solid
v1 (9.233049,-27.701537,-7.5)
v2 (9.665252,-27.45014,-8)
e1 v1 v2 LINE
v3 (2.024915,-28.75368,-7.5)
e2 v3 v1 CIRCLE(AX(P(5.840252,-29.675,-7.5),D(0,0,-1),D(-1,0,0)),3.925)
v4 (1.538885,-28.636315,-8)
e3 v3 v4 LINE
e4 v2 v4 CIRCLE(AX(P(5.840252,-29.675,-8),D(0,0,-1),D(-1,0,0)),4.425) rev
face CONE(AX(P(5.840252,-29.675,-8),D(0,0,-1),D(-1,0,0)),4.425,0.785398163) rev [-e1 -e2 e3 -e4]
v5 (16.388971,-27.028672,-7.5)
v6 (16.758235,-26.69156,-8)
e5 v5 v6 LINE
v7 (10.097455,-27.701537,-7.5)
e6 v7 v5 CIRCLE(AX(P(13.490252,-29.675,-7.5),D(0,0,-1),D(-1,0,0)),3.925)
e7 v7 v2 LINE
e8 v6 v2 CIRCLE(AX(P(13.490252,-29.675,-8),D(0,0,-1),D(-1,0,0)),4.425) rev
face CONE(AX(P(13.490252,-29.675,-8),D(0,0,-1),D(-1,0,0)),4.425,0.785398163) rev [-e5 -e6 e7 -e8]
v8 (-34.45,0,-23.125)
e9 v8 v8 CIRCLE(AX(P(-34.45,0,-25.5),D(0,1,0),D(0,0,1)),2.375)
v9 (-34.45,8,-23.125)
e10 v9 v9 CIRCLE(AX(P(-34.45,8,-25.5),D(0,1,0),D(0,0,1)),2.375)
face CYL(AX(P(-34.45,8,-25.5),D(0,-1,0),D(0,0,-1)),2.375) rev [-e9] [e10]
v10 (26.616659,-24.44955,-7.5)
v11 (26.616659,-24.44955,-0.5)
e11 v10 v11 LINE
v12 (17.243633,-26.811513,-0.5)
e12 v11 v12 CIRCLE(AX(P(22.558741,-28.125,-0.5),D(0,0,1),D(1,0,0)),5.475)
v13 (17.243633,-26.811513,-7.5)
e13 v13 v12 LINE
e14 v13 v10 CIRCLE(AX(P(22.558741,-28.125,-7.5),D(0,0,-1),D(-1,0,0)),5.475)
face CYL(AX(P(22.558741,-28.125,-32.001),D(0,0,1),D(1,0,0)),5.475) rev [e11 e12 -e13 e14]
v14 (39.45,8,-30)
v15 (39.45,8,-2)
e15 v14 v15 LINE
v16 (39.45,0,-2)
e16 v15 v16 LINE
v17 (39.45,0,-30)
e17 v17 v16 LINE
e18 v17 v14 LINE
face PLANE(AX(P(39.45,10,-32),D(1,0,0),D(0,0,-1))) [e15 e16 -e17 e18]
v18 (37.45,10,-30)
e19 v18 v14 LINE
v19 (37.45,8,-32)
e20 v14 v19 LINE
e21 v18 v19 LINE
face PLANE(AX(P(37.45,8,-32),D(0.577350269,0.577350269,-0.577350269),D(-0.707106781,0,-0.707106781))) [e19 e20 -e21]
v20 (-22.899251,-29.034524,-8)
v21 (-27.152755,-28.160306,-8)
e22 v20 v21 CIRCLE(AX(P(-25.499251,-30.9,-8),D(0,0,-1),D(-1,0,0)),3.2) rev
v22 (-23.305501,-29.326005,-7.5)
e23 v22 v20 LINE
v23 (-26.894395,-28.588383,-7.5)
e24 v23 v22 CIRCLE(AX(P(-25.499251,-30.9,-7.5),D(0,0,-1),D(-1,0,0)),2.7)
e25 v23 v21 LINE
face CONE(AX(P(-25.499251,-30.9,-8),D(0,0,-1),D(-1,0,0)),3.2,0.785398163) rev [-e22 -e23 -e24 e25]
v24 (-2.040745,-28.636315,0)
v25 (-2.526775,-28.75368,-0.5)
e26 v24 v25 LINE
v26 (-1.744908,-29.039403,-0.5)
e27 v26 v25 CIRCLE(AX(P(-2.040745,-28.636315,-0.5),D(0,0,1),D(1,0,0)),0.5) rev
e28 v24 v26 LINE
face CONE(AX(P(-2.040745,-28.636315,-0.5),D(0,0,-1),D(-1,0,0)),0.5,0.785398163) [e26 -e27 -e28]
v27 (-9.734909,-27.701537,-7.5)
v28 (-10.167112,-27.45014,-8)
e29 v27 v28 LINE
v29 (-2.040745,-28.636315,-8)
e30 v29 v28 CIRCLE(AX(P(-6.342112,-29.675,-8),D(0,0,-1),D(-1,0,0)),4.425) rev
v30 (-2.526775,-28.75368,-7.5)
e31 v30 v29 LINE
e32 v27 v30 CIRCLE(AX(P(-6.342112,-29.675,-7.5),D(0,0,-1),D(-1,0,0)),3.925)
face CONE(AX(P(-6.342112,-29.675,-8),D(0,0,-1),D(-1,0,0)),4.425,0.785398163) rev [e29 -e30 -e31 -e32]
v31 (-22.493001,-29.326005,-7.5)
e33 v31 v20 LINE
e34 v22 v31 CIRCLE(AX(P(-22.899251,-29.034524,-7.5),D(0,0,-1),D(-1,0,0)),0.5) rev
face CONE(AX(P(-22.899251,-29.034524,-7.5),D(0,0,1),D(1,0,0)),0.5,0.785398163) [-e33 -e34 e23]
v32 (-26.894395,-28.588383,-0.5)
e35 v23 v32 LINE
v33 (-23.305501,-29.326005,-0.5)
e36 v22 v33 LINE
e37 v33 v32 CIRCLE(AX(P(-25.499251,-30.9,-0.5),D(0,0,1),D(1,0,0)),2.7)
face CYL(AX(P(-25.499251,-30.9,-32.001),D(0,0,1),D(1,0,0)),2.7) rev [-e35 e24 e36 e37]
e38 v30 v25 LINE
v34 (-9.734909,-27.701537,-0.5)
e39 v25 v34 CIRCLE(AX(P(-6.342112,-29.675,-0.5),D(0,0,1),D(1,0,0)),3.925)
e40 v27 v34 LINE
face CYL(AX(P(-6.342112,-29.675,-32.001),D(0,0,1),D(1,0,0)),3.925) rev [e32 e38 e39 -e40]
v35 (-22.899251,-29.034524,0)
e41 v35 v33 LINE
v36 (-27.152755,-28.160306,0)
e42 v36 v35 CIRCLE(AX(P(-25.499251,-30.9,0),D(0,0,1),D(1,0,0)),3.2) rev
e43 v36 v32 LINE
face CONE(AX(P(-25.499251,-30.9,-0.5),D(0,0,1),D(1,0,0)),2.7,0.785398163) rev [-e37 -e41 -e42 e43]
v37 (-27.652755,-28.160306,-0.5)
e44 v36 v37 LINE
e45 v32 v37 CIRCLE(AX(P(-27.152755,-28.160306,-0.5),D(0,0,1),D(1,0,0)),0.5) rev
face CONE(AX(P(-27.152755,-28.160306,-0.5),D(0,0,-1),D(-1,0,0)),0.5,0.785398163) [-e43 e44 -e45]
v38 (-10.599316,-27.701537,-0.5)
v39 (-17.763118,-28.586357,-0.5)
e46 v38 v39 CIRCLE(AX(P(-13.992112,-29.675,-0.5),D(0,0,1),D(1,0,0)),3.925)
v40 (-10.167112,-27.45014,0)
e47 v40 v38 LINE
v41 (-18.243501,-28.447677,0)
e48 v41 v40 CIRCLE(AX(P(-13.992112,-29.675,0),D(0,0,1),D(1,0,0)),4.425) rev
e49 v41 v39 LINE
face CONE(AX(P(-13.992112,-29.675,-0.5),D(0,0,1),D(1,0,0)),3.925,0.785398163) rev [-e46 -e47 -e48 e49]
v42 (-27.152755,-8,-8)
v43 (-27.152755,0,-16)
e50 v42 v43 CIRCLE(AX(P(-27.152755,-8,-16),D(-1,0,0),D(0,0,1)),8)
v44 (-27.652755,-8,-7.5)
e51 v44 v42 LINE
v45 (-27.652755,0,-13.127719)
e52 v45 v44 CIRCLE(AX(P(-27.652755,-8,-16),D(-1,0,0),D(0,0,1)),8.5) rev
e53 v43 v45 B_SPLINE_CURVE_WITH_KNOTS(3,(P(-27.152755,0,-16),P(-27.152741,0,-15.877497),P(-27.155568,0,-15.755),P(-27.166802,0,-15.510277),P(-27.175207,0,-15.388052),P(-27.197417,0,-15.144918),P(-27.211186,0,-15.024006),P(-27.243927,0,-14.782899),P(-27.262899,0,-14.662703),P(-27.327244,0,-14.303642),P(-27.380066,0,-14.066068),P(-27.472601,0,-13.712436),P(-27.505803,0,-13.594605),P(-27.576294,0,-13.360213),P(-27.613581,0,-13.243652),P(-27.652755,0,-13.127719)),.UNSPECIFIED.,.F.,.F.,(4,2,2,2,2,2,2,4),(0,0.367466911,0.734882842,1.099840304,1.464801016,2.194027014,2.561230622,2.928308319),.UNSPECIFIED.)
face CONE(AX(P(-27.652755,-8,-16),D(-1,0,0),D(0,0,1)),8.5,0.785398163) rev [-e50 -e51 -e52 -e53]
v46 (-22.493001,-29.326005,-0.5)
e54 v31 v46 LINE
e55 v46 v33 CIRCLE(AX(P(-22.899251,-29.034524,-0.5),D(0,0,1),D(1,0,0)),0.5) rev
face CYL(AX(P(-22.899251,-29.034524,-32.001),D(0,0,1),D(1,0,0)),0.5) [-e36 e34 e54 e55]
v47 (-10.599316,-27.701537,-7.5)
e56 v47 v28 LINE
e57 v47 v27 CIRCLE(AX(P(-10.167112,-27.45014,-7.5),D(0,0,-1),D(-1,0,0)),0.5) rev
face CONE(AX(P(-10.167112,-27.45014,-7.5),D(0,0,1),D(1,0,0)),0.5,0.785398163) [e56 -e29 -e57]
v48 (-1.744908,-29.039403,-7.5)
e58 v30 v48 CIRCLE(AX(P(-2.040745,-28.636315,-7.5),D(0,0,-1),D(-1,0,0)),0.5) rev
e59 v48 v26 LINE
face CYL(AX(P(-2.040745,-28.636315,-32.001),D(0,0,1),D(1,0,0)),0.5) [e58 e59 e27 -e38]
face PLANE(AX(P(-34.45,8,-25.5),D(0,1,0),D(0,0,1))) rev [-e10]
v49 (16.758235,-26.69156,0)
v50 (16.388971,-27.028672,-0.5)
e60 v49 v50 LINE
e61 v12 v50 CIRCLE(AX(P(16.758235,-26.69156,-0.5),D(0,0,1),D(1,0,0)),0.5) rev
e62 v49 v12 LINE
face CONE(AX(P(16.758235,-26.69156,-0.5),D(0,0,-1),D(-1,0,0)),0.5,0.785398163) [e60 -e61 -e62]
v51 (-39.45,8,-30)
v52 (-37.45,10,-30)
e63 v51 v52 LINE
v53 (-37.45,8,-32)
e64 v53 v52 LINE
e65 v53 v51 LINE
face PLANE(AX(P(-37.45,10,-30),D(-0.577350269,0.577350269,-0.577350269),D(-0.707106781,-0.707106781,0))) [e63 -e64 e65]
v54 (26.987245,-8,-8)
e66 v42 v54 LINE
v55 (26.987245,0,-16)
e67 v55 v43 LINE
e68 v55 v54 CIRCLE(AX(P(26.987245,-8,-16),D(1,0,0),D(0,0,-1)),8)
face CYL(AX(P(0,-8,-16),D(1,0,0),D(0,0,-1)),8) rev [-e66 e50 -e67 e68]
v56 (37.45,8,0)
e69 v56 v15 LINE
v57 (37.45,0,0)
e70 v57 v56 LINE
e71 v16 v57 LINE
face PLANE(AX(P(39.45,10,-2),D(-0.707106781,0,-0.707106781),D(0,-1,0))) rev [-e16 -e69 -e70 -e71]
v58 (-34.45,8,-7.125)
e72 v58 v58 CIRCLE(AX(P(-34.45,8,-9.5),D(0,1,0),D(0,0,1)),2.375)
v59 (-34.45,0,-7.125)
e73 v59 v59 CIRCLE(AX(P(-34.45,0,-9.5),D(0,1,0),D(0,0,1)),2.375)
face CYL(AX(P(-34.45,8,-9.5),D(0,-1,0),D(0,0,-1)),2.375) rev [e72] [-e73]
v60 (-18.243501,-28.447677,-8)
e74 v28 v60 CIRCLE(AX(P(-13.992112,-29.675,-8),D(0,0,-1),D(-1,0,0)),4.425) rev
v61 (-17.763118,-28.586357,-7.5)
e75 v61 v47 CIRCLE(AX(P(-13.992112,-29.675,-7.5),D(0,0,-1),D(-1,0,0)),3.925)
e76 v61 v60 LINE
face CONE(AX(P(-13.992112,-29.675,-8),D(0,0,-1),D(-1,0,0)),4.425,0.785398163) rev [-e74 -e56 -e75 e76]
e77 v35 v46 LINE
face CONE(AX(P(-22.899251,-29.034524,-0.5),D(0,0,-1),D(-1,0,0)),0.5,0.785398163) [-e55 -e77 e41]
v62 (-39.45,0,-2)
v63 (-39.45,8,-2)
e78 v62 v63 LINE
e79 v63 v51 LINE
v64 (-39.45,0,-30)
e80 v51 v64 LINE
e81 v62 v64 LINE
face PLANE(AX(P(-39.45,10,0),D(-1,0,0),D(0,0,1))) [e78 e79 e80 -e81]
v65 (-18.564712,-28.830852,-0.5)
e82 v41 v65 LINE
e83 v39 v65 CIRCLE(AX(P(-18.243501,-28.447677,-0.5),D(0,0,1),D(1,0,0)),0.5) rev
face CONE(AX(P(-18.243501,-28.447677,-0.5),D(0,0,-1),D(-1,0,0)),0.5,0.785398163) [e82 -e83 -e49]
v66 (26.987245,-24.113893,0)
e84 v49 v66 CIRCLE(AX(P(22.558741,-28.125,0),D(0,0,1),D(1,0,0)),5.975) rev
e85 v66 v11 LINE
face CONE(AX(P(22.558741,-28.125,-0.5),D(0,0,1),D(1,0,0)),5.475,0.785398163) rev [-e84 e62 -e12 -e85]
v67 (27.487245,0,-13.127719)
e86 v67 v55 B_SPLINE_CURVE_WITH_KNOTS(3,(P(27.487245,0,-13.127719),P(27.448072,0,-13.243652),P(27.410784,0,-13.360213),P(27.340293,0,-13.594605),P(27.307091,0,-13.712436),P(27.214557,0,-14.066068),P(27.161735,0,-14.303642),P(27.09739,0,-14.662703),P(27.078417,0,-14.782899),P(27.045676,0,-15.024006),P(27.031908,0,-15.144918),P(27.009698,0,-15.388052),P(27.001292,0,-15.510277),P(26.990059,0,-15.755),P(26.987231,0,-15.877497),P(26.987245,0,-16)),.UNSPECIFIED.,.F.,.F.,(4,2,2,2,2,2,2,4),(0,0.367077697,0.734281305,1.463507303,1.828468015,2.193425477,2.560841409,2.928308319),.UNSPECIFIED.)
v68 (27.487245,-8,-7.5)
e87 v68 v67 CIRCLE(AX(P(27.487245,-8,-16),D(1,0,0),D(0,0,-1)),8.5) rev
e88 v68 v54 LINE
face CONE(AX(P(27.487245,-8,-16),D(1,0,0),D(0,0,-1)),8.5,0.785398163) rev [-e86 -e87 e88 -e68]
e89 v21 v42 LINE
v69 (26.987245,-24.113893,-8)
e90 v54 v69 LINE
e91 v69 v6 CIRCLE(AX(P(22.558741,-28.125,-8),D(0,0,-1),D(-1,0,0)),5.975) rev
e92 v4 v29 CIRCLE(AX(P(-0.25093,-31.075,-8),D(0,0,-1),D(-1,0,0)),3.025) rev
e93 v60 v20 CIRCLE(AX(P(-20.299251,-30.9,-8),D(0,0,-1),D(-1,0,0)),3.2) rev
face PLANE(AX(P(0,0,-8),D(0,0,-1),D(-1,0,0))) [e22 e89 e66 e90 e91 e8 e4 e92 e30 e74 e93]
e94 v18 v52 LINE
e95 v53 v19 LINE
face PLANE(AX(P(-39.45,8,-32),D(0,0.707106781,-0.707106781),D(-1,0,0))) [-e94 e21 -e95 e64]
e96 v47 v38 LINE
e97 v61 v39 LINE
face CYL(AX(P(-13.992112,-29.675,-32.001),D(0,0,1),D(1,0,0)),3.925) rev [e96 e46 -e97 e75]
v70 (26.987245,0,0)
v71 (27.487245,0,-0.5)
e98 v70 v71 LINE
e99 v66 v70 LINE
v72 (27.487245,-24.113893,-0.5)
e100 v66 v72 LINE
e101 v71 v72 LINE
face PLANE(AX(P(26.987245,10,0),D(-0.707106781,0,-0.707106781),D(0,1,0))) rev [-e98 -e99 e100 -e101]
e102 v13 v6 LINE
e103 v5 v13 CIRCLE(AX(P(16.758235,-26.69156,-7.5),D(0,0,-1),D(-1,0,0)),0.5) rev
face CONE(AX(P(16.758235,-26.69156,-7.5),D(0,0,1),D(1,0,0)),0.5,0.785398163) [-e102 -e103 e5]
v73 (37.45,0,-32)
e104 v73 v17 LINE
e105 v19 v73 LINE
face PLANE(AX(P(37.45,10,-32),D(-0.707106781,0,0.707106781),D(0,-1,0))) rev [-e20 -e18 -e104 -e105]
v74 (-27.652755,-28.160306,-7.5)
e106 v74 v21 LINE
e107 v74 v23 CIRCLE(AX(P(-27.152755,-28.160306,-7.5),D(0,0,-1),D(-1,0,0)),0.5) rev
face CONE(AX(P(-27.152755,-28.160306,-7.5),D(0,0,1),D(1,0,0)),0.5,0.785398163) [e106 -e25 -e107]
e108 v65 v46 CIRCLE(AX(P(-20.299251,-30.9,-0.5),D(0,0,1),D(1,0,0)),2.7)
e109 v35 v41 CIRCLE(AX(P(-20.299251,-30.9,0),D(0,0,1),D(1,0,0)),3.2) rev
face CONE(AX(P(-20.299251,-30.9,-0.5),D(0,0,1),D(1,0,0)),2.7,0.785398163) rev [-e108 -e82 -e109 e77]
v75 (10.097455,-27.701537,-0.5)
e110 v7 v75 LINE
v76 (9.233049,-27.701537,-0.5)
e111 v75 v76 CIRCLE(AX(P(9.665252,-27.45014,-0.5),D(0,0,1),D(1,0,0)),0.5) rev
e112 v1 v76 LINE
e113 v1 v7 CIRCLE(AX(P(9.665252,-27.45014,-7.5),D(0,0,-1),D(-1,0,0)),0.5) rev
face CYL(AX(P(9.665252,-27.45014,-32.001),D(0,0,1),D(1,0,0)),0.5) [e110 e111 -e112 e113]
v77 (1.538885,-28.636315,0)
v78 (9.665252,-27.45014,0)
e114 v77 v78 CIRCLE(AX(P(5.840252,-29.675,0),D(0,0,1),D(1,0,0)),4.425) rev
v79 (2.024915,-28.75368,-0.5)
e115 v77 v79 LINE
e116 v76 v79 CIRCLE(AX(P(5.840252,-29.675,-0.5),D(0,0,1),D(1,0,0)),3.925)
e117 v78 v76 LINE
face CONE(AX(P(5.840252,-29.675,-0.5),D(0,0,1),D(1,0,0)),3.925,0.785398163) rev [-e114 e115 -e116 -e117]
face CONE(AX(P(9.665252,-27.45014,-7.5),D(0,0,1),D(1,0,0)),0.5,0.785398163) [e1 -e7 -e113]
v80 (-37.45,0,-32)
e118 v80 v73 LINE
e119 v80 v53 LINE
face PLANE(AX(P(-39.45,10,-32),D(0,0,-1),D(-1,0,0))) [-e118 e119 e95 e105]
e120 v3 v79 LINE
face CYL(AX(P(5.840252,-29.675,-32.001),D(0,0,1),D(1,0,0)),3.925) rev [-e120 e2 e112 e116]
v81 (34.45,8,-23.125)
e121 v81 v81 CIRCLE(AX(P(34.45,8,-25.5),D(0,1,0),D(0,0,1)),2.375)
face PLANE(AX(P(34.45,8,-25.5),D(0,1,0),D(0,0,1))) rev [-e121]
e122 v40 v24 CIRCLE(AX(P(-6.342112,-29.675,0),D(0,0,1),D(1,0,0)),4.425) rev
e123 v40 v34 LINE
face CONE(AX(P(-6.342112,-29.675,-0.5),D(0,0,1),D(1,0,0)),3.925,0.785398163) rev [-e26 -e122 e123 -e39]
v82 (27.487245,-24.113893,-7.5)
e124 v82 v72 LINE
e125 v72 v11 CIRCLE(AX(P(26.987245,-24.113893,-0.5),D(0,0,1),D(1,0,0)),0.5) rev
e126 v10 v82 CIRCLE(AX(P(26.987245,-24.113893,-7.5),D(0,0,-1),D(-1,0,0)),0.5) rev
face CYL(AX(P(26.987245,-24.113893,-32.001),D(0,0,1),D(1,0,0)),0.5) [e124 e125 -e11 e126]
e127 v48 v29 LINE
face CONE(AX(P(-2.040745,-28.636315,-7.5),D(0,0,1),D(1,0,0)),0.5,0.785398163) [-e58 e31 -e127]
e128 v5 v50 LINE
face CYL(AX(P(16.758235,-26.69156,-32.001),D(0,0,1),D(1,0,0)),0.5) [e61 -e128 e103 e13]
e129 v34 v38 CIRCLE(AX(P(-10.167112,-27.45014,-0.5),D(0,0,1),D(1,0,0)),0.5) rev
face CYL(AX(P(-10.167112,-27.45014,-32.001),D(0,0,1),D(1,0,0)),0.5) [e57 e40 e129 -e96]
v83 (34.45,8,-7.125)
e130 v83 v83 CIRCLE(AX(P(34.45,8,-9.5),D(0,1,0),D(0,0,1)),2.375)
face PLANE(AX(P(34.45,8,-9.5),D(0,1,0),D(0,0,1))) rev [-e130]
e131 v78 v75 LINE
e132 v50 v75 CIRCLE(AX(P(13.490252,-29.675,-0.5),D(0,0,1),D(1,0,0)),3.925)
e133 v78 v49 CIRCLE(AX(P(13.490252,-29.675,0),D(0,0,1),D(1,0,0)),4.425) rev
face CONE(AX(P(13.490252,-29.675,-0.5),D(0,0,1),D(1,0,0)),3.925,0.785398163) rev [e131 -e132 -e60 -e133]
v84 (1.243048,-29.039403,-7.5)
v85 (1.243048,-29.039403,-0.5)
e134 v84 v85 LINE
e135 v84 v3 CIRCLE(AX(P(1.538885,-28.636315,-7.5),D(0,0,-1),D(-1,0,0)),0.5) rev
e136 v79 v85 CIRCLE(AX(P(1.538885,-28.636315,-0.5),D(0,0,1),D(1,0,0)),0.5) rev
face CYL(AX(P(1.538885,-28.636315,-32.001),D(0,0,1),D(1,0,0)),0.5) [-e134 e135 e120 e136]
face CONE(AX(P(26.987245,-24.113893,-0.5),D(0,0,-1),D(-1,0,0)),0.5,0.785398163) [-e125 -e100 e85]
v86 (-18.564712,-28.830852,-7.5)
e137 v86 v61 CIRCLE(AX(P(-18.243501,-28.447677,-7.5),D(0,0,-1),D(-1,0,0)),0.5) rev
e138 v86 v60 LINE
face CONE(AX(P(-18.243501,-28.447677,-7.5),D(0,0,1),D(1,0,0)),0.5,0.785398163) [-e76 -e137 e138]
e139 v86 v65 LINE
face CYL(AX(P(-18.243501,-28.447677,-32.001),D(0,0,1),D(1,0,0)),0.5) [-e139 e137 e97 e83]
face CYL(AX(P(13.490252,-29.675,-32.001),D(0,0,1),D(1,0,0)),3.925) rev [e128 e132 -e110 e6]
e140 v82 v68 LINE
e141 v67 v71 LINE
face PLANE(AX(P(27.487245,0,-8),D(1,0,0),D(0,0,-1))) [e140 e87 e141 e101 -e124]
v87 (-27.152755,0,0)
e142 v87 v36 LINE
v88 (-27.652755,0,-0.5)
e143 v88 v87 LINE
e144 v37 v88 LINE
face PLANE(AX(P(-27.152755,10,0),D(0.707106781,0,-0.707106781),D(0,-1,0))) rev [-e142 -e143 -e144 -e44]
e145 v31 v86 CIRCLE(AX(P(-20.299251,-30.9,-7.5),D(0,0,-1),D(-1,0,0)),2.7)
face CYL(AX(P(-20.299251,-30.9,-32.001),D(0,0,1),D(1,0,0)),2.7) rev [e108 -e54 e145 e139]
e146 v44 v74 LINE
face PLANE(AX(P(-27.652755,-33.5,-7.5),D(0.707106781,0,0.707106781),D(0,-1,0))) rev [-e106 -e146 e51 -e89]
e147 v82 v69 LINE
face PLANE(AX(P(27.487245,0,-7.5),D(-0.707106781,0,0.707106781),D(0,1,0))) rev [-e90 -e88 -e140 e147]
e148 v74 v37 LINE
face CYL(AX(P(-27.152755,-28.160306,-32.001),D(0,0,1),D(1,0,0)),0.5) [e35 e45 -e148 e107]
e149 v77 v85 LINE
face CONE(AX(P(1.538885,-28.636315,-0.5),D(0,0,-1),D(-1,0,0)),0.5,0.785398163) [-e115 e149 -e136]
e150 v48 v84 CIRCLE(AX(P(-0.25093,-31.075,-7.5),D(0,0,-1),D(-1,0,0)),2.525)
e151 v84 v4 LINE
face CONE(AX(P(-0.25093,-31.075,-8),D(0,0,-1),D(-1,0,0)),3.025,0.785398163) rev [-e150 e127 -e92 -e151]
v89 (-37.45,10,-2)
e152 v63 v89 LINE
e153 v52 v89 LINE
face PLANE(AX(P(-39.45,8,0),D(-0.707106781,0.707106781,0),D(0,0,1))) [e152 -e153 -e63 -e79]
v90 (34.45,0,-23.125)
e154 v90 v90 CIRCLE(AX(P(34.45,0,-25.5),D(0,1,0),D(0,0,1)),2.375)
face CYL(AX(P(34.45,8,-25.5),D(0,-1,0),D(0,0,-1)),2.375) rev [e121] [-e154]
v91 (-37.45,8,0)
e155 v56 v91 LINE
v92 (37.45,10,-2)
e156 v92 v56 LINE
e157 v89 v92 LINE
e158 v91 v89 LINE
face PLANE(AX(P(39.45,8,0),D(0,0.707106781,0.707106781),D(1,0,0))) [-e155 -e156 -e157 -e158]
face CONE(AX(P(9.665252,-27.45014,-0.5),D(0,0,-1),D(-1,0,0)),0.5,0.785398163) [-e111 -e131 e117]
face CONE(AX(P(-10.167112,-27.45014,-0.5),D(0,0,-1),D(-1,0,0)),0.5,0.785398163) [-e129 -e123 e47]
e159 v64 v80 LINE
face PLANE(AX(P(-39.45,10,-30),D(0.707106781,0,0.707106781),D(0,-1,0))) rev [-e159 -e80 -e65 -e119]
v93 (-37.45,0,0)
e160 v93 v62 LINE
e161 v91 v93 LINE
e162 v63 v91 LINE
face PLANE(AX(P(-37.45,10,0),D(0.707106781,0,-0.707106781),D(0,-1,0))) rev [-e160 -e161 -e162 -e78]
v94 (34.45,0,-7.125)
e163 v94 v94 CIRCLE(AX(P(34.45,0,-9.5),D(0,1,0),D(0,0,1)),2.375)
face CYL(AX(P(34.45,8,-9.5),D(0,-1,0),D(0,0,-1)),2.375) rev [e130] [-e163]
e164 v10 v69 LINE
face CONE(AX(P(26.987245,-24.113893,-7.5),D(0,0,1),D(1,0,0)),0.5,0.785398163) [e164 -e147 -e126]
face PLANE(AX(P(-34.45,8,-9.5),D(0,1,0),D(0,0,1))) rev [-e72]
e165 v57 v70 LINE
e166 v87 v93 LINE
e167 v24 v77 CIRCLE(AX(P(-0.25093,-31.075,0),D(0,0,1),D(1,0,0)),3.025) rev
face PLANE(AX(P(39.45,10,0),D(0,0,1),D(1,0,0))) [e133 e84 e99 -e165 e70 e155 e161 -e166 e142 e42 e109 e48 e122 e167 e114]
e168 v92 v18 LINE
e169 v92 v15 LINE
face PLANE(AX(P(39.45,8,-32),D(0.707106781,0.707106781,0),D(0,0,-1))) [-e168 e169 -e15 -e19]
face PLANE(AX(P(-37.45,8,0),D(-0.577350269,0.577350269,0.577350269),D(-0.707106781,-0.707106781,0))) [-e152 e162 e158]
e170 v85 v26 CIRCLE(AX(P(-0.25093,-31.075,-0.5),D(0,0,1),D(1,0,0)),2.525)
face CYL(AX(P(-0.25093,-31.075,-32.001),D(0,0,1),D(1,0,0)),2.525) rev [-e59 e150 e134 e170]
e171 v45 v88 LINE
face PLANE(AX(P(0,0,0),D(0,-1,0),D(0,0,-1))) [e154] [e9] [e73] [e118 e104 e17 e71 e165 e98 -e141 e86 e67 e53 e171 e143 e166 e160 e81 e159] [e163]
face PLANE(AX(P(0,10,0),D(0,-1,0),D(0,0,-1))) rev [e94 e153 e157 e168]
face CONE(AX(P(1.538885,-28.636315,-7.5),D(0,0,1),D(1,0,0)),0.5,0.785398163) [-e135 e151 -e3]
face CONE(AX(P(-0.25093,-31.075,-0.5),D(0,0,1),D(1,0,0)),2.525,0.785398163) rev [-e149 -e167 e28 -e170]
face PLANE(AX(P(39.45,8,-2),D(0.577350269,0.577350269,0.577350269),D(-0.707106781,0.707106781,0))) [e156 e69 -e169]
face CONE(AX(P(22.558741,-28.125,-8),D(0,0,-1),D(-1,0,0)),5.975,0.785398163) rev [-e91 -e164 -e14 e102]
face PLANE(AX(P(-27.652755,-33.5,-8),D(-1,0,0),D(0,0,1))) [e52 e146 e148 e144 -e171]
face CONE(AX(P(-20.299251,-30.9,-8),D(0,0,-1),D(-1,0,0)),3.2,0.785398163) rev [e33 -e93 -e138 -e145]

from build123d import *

# Parameters (mm, degrees)
SKETCH3_W           = 78.9
SKETCH3_H           = 32
BOSS_EXTRUDE1_DEPTH = 10
SKETCH3_4_R         = 2.375
CUT_EXTRUDE1_DEPTH  = 8
SKETCH4_W           = 55.14
SKETCH4_H           = 33.5
BOSS_EXTRUDE2_DEPTH = 8
CUT_EXTRUDE2_REACH  = 62.849
FILLET1_R           = 8
CHAMFER1_SIZE       = 2
CHAMFER2_SIZE       = 0.5


with BuildPart() as part:
    # Sketch3 → Boss-Extrude1 (new body)
    with BuildSketch(Plane(origin=(0, 0, 0), x_dir=(1, 0, 0), z_dir=(0, 1, 0))):
        with Locations((0, 16)):
            Rectangle(SKETCH3_W, SKETCH3_H)
    extrude(amount=BOSS_EXTRUDE1_DEPTH)

    # Sketch3<4> → Cut-Extrude1 (cut)
    with BuildSketch(Plane(origin=(0, 0, 0), x_dir=(1, 0, 0), z_dir=(0, 1, 0))):
        with Locations(Location((-34.45, 9.5, 0), (0, 0, 270))):
            Circle(SKETCH3_4_R)
        with Locations(Location((34.45, 9.5, 0), (0, 0, 270))):
            Circle(SKETCH3_4_R)
        with Locations(Location((-34.45, 25.5, 0), (0, 0, 270))):
            Circle(SKETCH3_4_R)
        with Locations(Location((34.45, 25.5, 0), (0, 0, 270))):
            Circle(SKETCH3_4_R)
    extrude(amount=CUT_EXTRUDE1_DEPTH, mode=Mode.SUBTRACT)

    # Sketch4 → Boss-Extrude2 (add)
    with BuildSketch(Plane.XY):
        with Locations((-0.082754798, -16.75)):
            Rectangle(SKETCH4_W, SKETCH4_H)
    extrude(amount=-BOSS_EXTRUDE2_DEPTH)

    # Sketch6 → Cut-Extrude2 (cut, up to next)
    with BuildSketch(Plane.XY, mode=Mode.PRIVATE) as cut_extrude2_sk1:
        with BuildLine():
            Line((-27.652754798, -33.5), (27.487245202, -33.5))
            Line((27.487245202, -33.5), (27.487245202, -24.11389297))
            ThreePointArc((27.487245202, -24.11389297), (27.167115928, -24.580418984), (26.616659115, -24.449550462))
            ThreePointArc((26.616659115, -24.449550462), (21.220888935, -22.815972253), (17.243633004, -26.811513376))
            ThreePointArc((17.243633004, -26.811513376), (16.881366116, -27.176161871), (16.388971366, -27.028672095))
            ThreePointArc((16.388971366, -27.028672095), (13.072861481, -25.77225608), (10.097455449, -27.701537013))
            ThreePointArc((10.097455449, -27.701537013), (9.665252059, -27.950140454), (9.23304867, -27.701537013))
            ThreePointArc((9.23304867, -27.701537013), (5.273342581, -25.791156717), (2.024915276, -28.753680172))
            ThreePointArc((2.024915276, -28.753680172), (1.710503102, -29.105939189), (1.243047888, -29.039403086))
            ThreePointArc((1.243047888, -29.039403086), (-0.250930092, -28.55), (-1.744908072, -29.039403086))
            ThreePointArc((-1.744908072, -29.039403086), (-2.212363286, -29.105939189), (-2.526775459, -28.753680172))
            ThreePointArc((-2.526775459, -28.753680172), (-5.775202765, -25.791156717), (-9.734908853, -27.701537013))
            ThreePointArc((-9.734908853, -27.701537013), (-10.167112243, -27.950140454), (-10.599315633, -27.701537013))
            ThreePointArc((-10.599315633, -27.701537013), (-14.473243405, -25.779600431), (-17.763117677, -28.586357258))
            ThreePointArc((-17.763117677, -28.586357258), (-18.097629496, -28.925925167), (-18.564711553, -28.830852177))
            ThreePointArc((-18.564711553, -28.830852177), (-20.636908569, -28.221196647), (-22.493001056, -29.326004785))
            ThreePointArc((-22.493001056, -29.326004785), (-22.899251056, -29.534524189), (-23.305501056, -29.326004785))
            ThreePointArc((-23.305501056, -29.326004785), (-24.955684592, -28.255281584), (-26.894394838, -28.588382855))
            ThreePointArc((-26.894394838, -28.588382855), (-27.398539277, -28.595724932), (-27.652754798, -28.160305606))
            Line((-27.652754798, -28.160305606), (-27.652754798, -33.5))
        make_face()
    cut_extrude2_tool1 = extrude(cut_extrude2_sk1.sketch, amount=-CUT_EXTRUDE2_REACH, mode=Mode.PRIVATE) & part.part
    add(cut_extrude2_tool1.solids().sort_by_distance((2.915251, -29.773814, 0))[0], mode=Mode.SUBTRACT)

    # Fillet1
    fillet1_edges = [part.edges().sort_by_distance(p)[0] for p in [
        (-0.082754798, 0, -8),
    ]]
    fillet(fillet1_edges, radius=FILLET1_R)

    # Chamfer1
    chamfer1_edges = [part.edges().sort_by_distance(p)[0] for p in [
        (39.45, 10, -16),
        (0, 10, 0),
        (-39.45, 10, -16),
        (0, 10, -32),
        (-39.45, 5, 0),
        (39.45, 5, 0),
        (39.45, 5, -32),
        (-39.45, 5, -32),
    ]]
    chamfer(chamfer1_edges, length=CHAMFER1_SIZE)

    # Chamfer2
    # the kernel refuses this chamfer: 0.5 mm, written as the material it takes off along each edge
    with BuildSketch(Plane(origin=(-27.652754798, -28.160305606, -8), x_dir=(0, 0, 1), z_dir=(0, 1, 0))) as chamfer2_piece_1:
        Polygon((CHAMFER2_SIZE, 0), (0, CHAMFER2_SIZE), (0, 0), align=None)
    extrude(amount=20.160305606, mode=Mode.SUBTRACT)
    with BuildSketch(Plane(origin=(-27.652754798, -8, -16), x_dir=(0, 0.8858914010009324, -0.4638926876257108), z_dir=(0, -0.4638926876257108, -0.8858914010009324))) as chamfer2_piece_2_section:
        Polygon((8 + CHAMFER2_SIZE, 0), (8, CHAMFER2_SIZE), (8, 0), align=None)
    chamfer2_piece_2 = revolve(axis=Axis((-27.652754798, -8, -16), (1, 0, 0)), revolution_arc=117.638582209, mode=Mode.PRIVATE)
    chamfer2_piece_2 = split(chamfer2_piece_2, bisect_by=Plane(origin=(-27.652754798, 0, -16), z_dir=(0, -1, 0)), keep=Keep.TOP, mode=Mode.PRIVATE)
    add(chamfer2_piece_2, mode=Mode.SUBTRACT)
    with BuildSketch(Plane(origin=(27.487245202, -8, -16), x_dir=(0, 0.8858914010009324, -0.4638926876257108), z_dir=(0, -0.4638926876257108, -0.8858914010009324))) as chamfer2_piece_3_section:
        Polygon((8, -CHAMFER2_SIZE), (8 + CHAMFER2_SIZE, 0), (8, 0), align=None)
    chamfer2_piece_3 = revolve(axis=Axis((27.487245202, -8, -16), (1, 0, 0)), revolution_arc=117.638582209, mode=Mode.PRIVATE)
    chamfer2_piece_3 = split(chamfer2_piece_3, bisect_by=Plane(origin=(27.487245202, 0, -16), z_dir=(0, -1, 0)), keep=Keep.TOP, mode=Mode.PRIVATE)
    add(chamfer2_piece_3, mode=Mode.SUBTRACT)
    with BuildSketch(Plane(origin=(-27.652754798, -28.160305606, 0), x_dir=(1, 0, 0), z_dir=(0, 1, 0))) as chamfer2_piece_4:
        Polygon((CHAMFER2_SIZE, 0), (0, CHAMFER2_SIZE), (0, 0), align=None)
    extrude(amount=28.160305606, mode=Mode.SUBTRACT)
    with BuildSketch(Plane(origin=(27.487245202, -8, -8), x_dir=(0, 0, 1), z_dir=(0, -1, 0))) as chamfer2_piece_5:
        Polygon((CHAMFER2_SIZE, 0), (0, CHAMFER2_SIZE), (0, 0), align=None)
    extrude(amount=16.11389297, mode=Mode.SUBTRACT)
    with BuildSketch(Plane(origin=(27.487245202, 0, 0), x_dir=(-1, 0, 0), z_dir=(0, -1, 0))) as chamfer2_piece_6:
        Polygon((CHAMFER2_SIZE, 0), (0, CHAMFER2_SIZE), (0, 0), align=None)
    extrude(amount=24.11389297, mode=Mode.SUBTRACT)
    with BuildSketch(Plane(origin=(-18.243500534, -28.447676654, -8), x_dir=(-0.6424220378621972, -0.7663510457153313, 0), z_dir=(-0.7663510457153313, 0.6424220378621972, 0))) as chamfer2_piece_7:
        Polygon((0.5, CHAMFER2_SIZE), (0.5 - CHAMFER2_SIZE, 0), (0.5, 0), align=None)
    revolve(axis=Axis((-18.243500534, -28.447676654, -8), (0, 0, 1)), revolution_arc=113.869886465, mode=Mode.SUBTRACT)
    with BuildSketch(Plane(origin=(-13.992112243, -29.675, -8), x_dir=(0.8644067796610168, 0.5027931177691978, 0), z_dir=(0.5027931177691978, -0.8644067796610168, 0))) as chamfer2_piece_8:
        Polygon((3.925, CHAMFER2_SIZE), (3.925 + CHAMFER2_SIZE, 0), (3.925, 0), align=None)
    revolve(axis=Axis((-13.992112243, -29.675, -8), (0, 0, 1)), revolution_arc=133.712259818, mode=Mode.SUBTRACT)
    with BuildSketch(Plane(origin=(-10.167112243, -27.450140454, -8), x_dir=(-0.8644067796610185, -0.5027931177691948, 0), z_dir=(-0.5027931177691948, 0.8644067796610185, 0))) as chamfer2_piece_9:
        Polygon((0.5, CHAMFER2_SIZE), (0.5 - CHAMFER2_SIZE, 0), (0.5, 0), align=None)
    revolve(axis=Axis((-10.167112243, -27.450140454, -8), (0, 0, 1)), revolution_arc=119.63007225, mode=Mode.SUBTRACT)
    with BuildSketch(Plane(origin=(-6.342112243, -29.675, -8), x_dir=(0.9720603270931867, 0.23473116642552358, 0), z_dir=(0.23473116642552358, -0.9720603270931867, 0))) as chamfer2_piece_10:
        Polygon((3.925, CHAMFER2_SIZE), (3.925 + CHAMFER2_SIZE, 0), (3.925, 0), align=None)
    revolve(axis=Axis((-6.342112243, -29.675, -8), (0, 0, 1)), revolution_arc=136.239259635, mode=Mode.SUBTRACT)
    with BuildSketch(Plane(origin=(-2.040745296, -28.636314589, -8), x_dir=(-0.9720603270931848, -0.23473116642553216, 0), z_dir=(-0.23473116642553216, 0.9720603270931848, 0))) as chamfer2_piece_11:
        Polygon((0.5, CHAMFER2_SIZE), (0.5 - CHAMFER2_SIZE, 0), (0.5, 0), align=None)
    revolve(axis=Axis((-2.040745296, -28.636314589, -8), (0, 0, 1)), revolution_arc=112.700145839, mode=Mode.SUBTRACT)
    with BuildSketch(Plane(origin=(-0.250930092, -31.075, -8), x_dir=(0.5916744475658624, 0.8061769955150243, 0), z_dir=(0.8061769955150243, -0.5916744475658624, 0))) as chamfer2_piece_12:
        Polygon((2.525, CHAMFER2_SIZE), (2.525 + CHAMFER2_SIZE, 0), (2.525, 0), align=None)
    revolve(axis=Axis((-0.250930092, -31.075, -8), (0, 0, 1)), revolution_arc=72.551844659, mode=Mode.SUBTRACT)
    with BuildSketch(Plane(origin=(1.538885112, -28.636314589, -8), x_dir=(-0.5916744475658654, -0.8061769955150222, 0), z_dir=(-0.8061769955150222, 0.5916744475658654, 0))) as chamfer2_piece_13:
        Polygon((0.5, CHAMFER2_SIZE), (0.5 - CHAMFER2_SIZE, 0), (0.5, 0), align=None)
    revolve(axis=Axis((1.538885112, -28.636314589, -8), (0, 0, 1)), revolution_arc=112.700145839, mode=Mode.SUBTRACT)
    with BuildSketch(Plane(origin=(5.840252059, -29.675, -8), x_dir=(0.864406779661017, 0.5027931177691973, 0), z_dir=(0.5027931177691973, -0.864406779661017, 0))) as chamfer2_piece_14:
        Polygon((3.925, CHAMFER2_SIZE), (3.925 + CHAMFER2_SIZE, 0), (3.925, 0), align=None)
    revolve(axis=Axis((5.840252059, -29.675, -8), (0, 0, 1)), revolution_arc=136.239259635, mode=Mode.SUBTRACT)
    with BuildSketch(Plane(origin=(9.665252059, -27.450140454, -8), x_dir=(-0.8644067796610146, -0.5027931177692017, 0), z_dir=(-0.5027931177692017, 0.8644067796610146, 0))) as chamfer2_piece_15:
        Polygon((0.5, CHAMFER2_SIZE), (0.5 - CHAMFER2_SIZE, 0), (0.5, 0), align=None)
    revolve(axis=Axis((9.665252059, -27.450140454, -8), (0, 0, 1)), revolution_arc=119.63007225, mode=Mode.SUBTRACT)
    with BuildSketch(Plane(origin=(13.490252059, -29.675, -8), x_dir=(0.7385272118911914, 0.6742236700800583, 0), z_dir=(0.6742236700800583, -0.7385272118911914, 0))) as chamfer2_piece_16:
        Polygon((3.925, CHAMFER2_SIZE), (3.925 + CHAMFER2_SIZE, 0), (3.925, 0), align=None)
    revolve(axis=Axis((13.490252059, -29.675, -8), (0, 0, 1)), revolution_arc=107.421143416, mode=Mode.SUBTRACT)
    with BuildSketch(Plane(origin=(16.758234972, -26.69156026, -8), x_dir=(-0.7385272118911994, -0.6742236700800496, 0), z_dir=(-0.6742236700800496, 0.7385272118911994, 0))) as chamfer2_piece_17:
        Polygon((0.5, CHAMFER2_SIZE), (0.5 - CHAMFER2_SIZE, 0), (0.5, 0), align=None)
    revolve(axis=Axis((16.758234972, -26.69156026, -8), (0, 0, 1)), revolution_arc=123.725101084, mode=Mode.SUBTRACT)
    with BuildSketch(Plane(origin=(22.55874146, -28.125, -8), x_dir=(0.7411721744642813, 0.6713149840424306, 0), z_dir=(0.6713149840424306, -0.7411721744642813, 0))) as chamfer2_piece_18:
        Polygon((5.475, CHAMFER2_SIZE), (5.475 + CHAMFER2_SIZE, 0), (5.475, 0), align=None)
    revolve(axis=Axis((22.55874146, -28.125, -8), (0, 0, 1)), revolution_arc=123.950356593, mode=Mode.SUBTRACT)
    with BuildSketch(Plane(origin=(26.987245202, -24.11389297, -8), x_dir=(-0.7411721744642809, -0.6713149840424313, 0), z_dir=(-0.6713149840424313, 0.7411721744642809, 0))) as chamfer2_piece_19:
        Polygon((0.5, CHAMFER2_SIZE), (0.5 - CHAMFER2_SIZE, 0), (0.5, 0), align=None)
    revolve(axis=Axis((26.987245202, -24.11389297, -8), (0, 0, 1)), revolution_arc=137.831362799, mode=Mode.SUBTRACT)
    with BuildSketch(Plane(origin=(-27.152754798, -28.160305606, -8), x_dir=(-1, 0, 0), z_dir=(0, 1, 0))) as chamfer2_piece_20:
        Polygon((0.5, CHAMFER2_SIZE), (0.5 - CHAMFER2_SIZE, 0), (0.5, 0), align=None)
    revolve(axis=Axis((-27.152754798, -28.160305606, -8), (0, 0, 1)), revolution_arc=121.112486243, mode=Mode.SUBTRACT)
    with BuildSketch(Plane(origin=(-25.499251056, -30.9, -8), x_dir=(0.8125000000000023, 0.5829611908180474, 0), z_dir=(0.5829611908180474, -0.8125000000000023, 0))) as chamfer2_piece_21:
        Polygon((2.7, CHAMFER2_SIZE), (2.7 + CHAMFER2_SIZE, 0), (2.7, 0), align=None)
    revolve(axis=Axis((-25.499251056, -30.9, -8), (0, 0, 1)), revolution_arc=85.453398547, mode=Mode.SUBTRACT)
    with BuildSketch(Plane(origin=(-22.899251056, -29.034524189, -8), x_dir=(-0.8124999999999996, -0.5829611908180515, 0), z_dir=(-0.5829611908180515, 0.8124999999999996, 0))) as chamfer2_piece_22:
        Polygon((0.5, CHAMFER2_SIZE), (0.5 - CHAMFER2_SIZE, 0), (0.5, 0), align=None)
    revolve(axis=Axis((-22.899251056, -29.034524189, -8), (0, 0, 1)), revolution_arc=108.681824608, mode=Mode.SUBTRACT)
    with BuildSketch(Plane(origin=(-20.299251056, -30.9, -8), x_dir=(0.6424220378622064, 0.7663510457153235, 0), z_dir=(0.7663510457153235, -0.6424220378622064, 0))) as chamfer2_piece_23:
        Polygon((2.7, CHAMFER2_SIZE), (2.7 + CHAMFER2_SIZE, 0), (2.7, 0), align=None)
    revolve(axis=Axis((-20.299251056, -30.9, -8), (0, 0, 1)), revolution_arc=94.313575076, mode=Mode.SUBTRACT)
    with BuildSketch(Plane(origin=(-18.243500534, -28.447676654, 0), x_dir=(0.9607657155546954, -0.2773612082009208, 0), z_dir=(0.2773612082009208, 0.9607657155546954, 0))) as chamfer2_piece_24:
        Polygon((0.5 - CHAMFER2_SIZE, 0), (0.5, CHAMFER2_SIZE), (0.5, 0), align=None)
    revolve(axis=Axis((-18.243500534, -28.447676654, 0), (0, 0, -1)), revolution_arc=113.869886465, mode=Mode.SUBTRACT)
    with BuildSketch(Plane(origin=(-20.299251056, -30.9, 0), x_dir=(0.6424220378622064, 0.7663510457153235, 0), z_dir=(0.7663510457153235, -0.6424220378622064, 0))) as chamfer2_piece_25:
        Polygon((2.7 + CHAMFER2_SIZE, 0), (2.7, -CHAMFER2_SIZE), (2.7, 0), align=None)
    revolve(axis=Axis((-20.299251056, -30.9, 0), (0, 0, 1)), revolution_arc=94.313575076, mode=Mode.SUBTRACT)
    with BuildSketch(Plane(origin=(-22.899251056, -29.034524189, 0), x_dir=(0.812500000000002, -0.5829611908180482, 0), z_dir=(0.5829611908180482, 0.812500000000002, 0))) as chamfer2_piece_26:
        Polygon((0.5 - CHAMFER2_SIZE, 0), (0.5, CHAMFER2_SIZE), (0.5, 0), align=None)
    revolve(axis=Axis((-22.899251056, -29.034524189, 0), (0, 0, -1)), revolution_arc=108.681824608, mode=Mode.SUBTRACT)
    with BuildSketch(Plane(origin=(-25.499251056, -30.9, 0), x_dir=(0.8125000000000023, 0.5829611908180474, 0), z_dir=(0.5829611908180474, -0.8125000000000023, 0))) as chamfer2_piece_27:
        Polygon((2.7 + CHAMFER2_SIZE, 0), (2.7, -CHAMFER2_SIZE), (2.7, 0), align=None)
    revolve(axis=Axis((-25.499251056, -30.9, 0), (0, 0, 1)), revolution_arc=85.453398547, mode=Mode.SUBTRACT)
    with BuildSketch(Plane(origin=(-27.152754798, -28.160305606, 0), x_dir=(0.5167199195075316, -0.8561544981976853, 0), z_dir=(0.8561544981976853, 0.5167199195075316, 0))) as chamfer2_piece_28:
        Polygon((0.5 - CHAMFER2_SIZE, 0), (0.5, CHAMFER2_SIZE), (0.5, 0), align=None)
    revolve(axis=Axis((-27.152754798, -28.160305606, 0), (0, 0, -1)), revolution_arc=121.112486243, mode=Mode.SUBTRACT)
    with BuildSketch(Plane(origin=(26.987245202, -24.11389297, 0), x_dir=(1, 0, 0), z_dir=(0, 1, 0))) as chamfer2_piece_29:
        Polygon((0.5 - CHAMFER2_SIZE, 0), (0.5, CHAMFER2_SIZE), (0.5, 0), align=None)
    revolve(axis=Axis((26.987245202, -24.11389297, 0), (0, 0, -1)), revolution_arc=137.831362799, mode=Mode.SUBTRACT)
    with BuildSketch(Plane(origin=(22.55874146, -28.125, 0), x_dir=(0.7411721744642813, 0.6713149840424306, 0), z_dir=(0.6713149840424306, -0.7411721744642813, 0))) as chamfer2_piece_30:
        Polygon((5.475 + CHAMFER2_SIZE, 0), (5.475, -CHAMFER2_SIZE), (5.475, 0), align=None)
    revolve(axis=Axis((22.55874146, -28.125, 0), (0, 0, 1)), revolution_arc=123.950356593, mode=Mode.SUBTRACT)
    with BuildSketch(Plane(origin=(16.758234972, -26.69156026, 0), x_dir=(0.9707960648529864, -0.23990623265341857, 0), z_dir=(0.23990623265341857, 0.9707960648529864, 0))) as chamfer2_piece_31:
        Polygon((0.5 - CHAMFER2_SIZE, 0), (0.5, CHAMFER2_SIZE), (0.5, 0), align=None)
    revolve(axis=Axis((16.758234972, -26.69156026, 0), (0, 0, -1)), revolution_arc=123.725101084, mode=Mode.SUBTRACT)
    with BuildSketch(Plane(origin=(13.490252059, -29.675, 0), x_dir=(0.7385272118911914, 0.6742236700800583, 0), z_dir=(0.6742236700800583, -0.7385272118911914, 0))) as chamfer2_piece_32:
        Polygon((3.925 + CHAMFER2_SIZE, 0), (3.925, -CHAMFER2_SIZE), (3.925, 0), align=None)
    revolve(axis=Axis((13.490252059, -29.675, 0), (0, 0, 1)), revolution_arc=107.421143416, mode=Mode.SUBTRACT)
    with BuildSketch(Plane(origin=(9.665252059, -27.450140454, 0), x_dir=(0.8644067796610185, -0.5027931177691948, 0), z_dir=(0.5027931177691948, 0.8644067796610185, 0))) as chamfer2_piece_33:
        Polygon((0.5 - CHAMFER2_SIZE, 0), (0.5, CHAMFER2_SIZE), (0.5, 0), align=None)
    revolve(axis=Axis((9.665252059, -27.450140454, 0), (0, 0, -1)), revolution_arc=119.63007225, mode=Mode.SUBTRACT)
    with BuildSketch(Plane(origin=(5.840252059, -29.675, 0), x_dir=(0.864406779661017, 0.5027931177691973, 0), z_dir=(0.5027931177691973, -0.864406779661017, 0))) as chamfer2_piece_34:
        Polygon((3.925 + CHAMFER2_SIZE, 0), (3.925, -CHAMFER2_SIZE), (3.925, 0), align=None)
    revolve(axis=Axis((5.840252059, -29.675, 0), (0, 0, 1)), revolution_arc=136.239259635, mode=Mode.SUBTRACT)
    with BuildSketch(Plane(origin=(1.538885112, -28.636314589, 0), x_dir=(0.9720603270931909, -0.23473116642550618, 0), z_dir=(0.23473116642550618, 0.9720603270931909, 0))) as chamfer2_piece_35:
        Polygon((0.5 - CHAMFER2_SIZE, 0), (0.5, CHAMFER2_SIZE), (0.5, 0), align=None)
    revolve(axis=Axis((1.538885112, -28.636314589, 0), (0, 0, -1)), revolution_arc=112.700145839, mode=Mode.SUBTRACT)
    with BuildSketch(Plane(origin=(-0.250930092, -31.075, 0), x_dir=(0.5916744475658624, 0.8061769955150243, 0), z_dir=(0.8061769955150243, -0.5916744475658624, 0))) as chamfer2_piece_36:
        Polygon((2.525 + CHAMFER2_SIZE, 0), (2.525, -CHAMFER2_SIZE), (2.525, 0), align=None)
    revolve(axis=Axis((-0.250930092, -31.075, 0), (0, 0, 1)), revolution_arc=72.551844659, mode=Mode.SUBTRACT)
    with BuildSketch(Plane(origin=(-2.040745296, -28.636314589, 0), x_dir=(0.5916744475658575, -0.8061769955150281, 0), z_dir=(0.8061769955150281, 0.5916744475658575, 0))) as chamfer2_piece_37:
        Polygon((0.5 - CHAMFER2_SIZE, 0), (0.5, CHAMFER2_SIZE), (0.5, 0), align=None)
    revolve(axis=Axis((-2.040745296, -28.636314589, 0), (0, 0, -1)), revolution_arc=112.700145839, mode=Mode.SUBTRACT)
    with BuildSketch(Plane(origin=(-6.342112243, -29.675, 0), x_dir=(0.9720603270931867, 0.23473116642552358, 0), z_dir=(0.23473116642552358, -0.9720603270931867, 0))) as chamfer2_piece_38:
        Polygon((3.925 + CHAMFER2_SIZE, 0), (3.925, -CHAMFER2_SIZE), (3.925, 0), align=None)
    revolve(axis=Axis((-6.342112243, -29.675, 0), (0, 0, 1)), revolution_arc=136.239259635, mode=Mode.SUBTRACT)
    with BuildSketch(Plane(origin=(-10.167112243, -27.450140454, 0), x_dir=(0.8644067796610155, -0.5027931177692001, 0), z_dir=(0.5027931177692001, 0.8644067796610155, 0))) as chamfer2_piece_39:
        Polygon((0.5 - CHAMFER2_SIZE, 0), (0.5, CHAMFER2_SIZE), (0.5, 0), align=None)
    revolve(axis=Axis((-10.167112243, -27.450140454, 0), (0, 0, -1)), revolution_arc=119.63007225, mode=Mode.SUBTRACT)
    with BuildSketch(Plane(origin=(-13.992112243, -29.675, 0), x_dir=(0.8644067796610168, 0.5027931177691978, 0), z_dir=(0.5027931177691978, -0.8644067796610168, 0))) as chamfer2_piece_40:
        Polygon((3.925 + CHAMFER2_SIZE, 0), (3.925, -CHAMFER2_SIZE), (3.925, 0), align=None)
    revolve(axis=Axis((-13.992112243, -29.675, 0), (0, 0, 1)), revolution_arc=133.712259818, mode=Mode.SUBTRACT)


solid = part.part
